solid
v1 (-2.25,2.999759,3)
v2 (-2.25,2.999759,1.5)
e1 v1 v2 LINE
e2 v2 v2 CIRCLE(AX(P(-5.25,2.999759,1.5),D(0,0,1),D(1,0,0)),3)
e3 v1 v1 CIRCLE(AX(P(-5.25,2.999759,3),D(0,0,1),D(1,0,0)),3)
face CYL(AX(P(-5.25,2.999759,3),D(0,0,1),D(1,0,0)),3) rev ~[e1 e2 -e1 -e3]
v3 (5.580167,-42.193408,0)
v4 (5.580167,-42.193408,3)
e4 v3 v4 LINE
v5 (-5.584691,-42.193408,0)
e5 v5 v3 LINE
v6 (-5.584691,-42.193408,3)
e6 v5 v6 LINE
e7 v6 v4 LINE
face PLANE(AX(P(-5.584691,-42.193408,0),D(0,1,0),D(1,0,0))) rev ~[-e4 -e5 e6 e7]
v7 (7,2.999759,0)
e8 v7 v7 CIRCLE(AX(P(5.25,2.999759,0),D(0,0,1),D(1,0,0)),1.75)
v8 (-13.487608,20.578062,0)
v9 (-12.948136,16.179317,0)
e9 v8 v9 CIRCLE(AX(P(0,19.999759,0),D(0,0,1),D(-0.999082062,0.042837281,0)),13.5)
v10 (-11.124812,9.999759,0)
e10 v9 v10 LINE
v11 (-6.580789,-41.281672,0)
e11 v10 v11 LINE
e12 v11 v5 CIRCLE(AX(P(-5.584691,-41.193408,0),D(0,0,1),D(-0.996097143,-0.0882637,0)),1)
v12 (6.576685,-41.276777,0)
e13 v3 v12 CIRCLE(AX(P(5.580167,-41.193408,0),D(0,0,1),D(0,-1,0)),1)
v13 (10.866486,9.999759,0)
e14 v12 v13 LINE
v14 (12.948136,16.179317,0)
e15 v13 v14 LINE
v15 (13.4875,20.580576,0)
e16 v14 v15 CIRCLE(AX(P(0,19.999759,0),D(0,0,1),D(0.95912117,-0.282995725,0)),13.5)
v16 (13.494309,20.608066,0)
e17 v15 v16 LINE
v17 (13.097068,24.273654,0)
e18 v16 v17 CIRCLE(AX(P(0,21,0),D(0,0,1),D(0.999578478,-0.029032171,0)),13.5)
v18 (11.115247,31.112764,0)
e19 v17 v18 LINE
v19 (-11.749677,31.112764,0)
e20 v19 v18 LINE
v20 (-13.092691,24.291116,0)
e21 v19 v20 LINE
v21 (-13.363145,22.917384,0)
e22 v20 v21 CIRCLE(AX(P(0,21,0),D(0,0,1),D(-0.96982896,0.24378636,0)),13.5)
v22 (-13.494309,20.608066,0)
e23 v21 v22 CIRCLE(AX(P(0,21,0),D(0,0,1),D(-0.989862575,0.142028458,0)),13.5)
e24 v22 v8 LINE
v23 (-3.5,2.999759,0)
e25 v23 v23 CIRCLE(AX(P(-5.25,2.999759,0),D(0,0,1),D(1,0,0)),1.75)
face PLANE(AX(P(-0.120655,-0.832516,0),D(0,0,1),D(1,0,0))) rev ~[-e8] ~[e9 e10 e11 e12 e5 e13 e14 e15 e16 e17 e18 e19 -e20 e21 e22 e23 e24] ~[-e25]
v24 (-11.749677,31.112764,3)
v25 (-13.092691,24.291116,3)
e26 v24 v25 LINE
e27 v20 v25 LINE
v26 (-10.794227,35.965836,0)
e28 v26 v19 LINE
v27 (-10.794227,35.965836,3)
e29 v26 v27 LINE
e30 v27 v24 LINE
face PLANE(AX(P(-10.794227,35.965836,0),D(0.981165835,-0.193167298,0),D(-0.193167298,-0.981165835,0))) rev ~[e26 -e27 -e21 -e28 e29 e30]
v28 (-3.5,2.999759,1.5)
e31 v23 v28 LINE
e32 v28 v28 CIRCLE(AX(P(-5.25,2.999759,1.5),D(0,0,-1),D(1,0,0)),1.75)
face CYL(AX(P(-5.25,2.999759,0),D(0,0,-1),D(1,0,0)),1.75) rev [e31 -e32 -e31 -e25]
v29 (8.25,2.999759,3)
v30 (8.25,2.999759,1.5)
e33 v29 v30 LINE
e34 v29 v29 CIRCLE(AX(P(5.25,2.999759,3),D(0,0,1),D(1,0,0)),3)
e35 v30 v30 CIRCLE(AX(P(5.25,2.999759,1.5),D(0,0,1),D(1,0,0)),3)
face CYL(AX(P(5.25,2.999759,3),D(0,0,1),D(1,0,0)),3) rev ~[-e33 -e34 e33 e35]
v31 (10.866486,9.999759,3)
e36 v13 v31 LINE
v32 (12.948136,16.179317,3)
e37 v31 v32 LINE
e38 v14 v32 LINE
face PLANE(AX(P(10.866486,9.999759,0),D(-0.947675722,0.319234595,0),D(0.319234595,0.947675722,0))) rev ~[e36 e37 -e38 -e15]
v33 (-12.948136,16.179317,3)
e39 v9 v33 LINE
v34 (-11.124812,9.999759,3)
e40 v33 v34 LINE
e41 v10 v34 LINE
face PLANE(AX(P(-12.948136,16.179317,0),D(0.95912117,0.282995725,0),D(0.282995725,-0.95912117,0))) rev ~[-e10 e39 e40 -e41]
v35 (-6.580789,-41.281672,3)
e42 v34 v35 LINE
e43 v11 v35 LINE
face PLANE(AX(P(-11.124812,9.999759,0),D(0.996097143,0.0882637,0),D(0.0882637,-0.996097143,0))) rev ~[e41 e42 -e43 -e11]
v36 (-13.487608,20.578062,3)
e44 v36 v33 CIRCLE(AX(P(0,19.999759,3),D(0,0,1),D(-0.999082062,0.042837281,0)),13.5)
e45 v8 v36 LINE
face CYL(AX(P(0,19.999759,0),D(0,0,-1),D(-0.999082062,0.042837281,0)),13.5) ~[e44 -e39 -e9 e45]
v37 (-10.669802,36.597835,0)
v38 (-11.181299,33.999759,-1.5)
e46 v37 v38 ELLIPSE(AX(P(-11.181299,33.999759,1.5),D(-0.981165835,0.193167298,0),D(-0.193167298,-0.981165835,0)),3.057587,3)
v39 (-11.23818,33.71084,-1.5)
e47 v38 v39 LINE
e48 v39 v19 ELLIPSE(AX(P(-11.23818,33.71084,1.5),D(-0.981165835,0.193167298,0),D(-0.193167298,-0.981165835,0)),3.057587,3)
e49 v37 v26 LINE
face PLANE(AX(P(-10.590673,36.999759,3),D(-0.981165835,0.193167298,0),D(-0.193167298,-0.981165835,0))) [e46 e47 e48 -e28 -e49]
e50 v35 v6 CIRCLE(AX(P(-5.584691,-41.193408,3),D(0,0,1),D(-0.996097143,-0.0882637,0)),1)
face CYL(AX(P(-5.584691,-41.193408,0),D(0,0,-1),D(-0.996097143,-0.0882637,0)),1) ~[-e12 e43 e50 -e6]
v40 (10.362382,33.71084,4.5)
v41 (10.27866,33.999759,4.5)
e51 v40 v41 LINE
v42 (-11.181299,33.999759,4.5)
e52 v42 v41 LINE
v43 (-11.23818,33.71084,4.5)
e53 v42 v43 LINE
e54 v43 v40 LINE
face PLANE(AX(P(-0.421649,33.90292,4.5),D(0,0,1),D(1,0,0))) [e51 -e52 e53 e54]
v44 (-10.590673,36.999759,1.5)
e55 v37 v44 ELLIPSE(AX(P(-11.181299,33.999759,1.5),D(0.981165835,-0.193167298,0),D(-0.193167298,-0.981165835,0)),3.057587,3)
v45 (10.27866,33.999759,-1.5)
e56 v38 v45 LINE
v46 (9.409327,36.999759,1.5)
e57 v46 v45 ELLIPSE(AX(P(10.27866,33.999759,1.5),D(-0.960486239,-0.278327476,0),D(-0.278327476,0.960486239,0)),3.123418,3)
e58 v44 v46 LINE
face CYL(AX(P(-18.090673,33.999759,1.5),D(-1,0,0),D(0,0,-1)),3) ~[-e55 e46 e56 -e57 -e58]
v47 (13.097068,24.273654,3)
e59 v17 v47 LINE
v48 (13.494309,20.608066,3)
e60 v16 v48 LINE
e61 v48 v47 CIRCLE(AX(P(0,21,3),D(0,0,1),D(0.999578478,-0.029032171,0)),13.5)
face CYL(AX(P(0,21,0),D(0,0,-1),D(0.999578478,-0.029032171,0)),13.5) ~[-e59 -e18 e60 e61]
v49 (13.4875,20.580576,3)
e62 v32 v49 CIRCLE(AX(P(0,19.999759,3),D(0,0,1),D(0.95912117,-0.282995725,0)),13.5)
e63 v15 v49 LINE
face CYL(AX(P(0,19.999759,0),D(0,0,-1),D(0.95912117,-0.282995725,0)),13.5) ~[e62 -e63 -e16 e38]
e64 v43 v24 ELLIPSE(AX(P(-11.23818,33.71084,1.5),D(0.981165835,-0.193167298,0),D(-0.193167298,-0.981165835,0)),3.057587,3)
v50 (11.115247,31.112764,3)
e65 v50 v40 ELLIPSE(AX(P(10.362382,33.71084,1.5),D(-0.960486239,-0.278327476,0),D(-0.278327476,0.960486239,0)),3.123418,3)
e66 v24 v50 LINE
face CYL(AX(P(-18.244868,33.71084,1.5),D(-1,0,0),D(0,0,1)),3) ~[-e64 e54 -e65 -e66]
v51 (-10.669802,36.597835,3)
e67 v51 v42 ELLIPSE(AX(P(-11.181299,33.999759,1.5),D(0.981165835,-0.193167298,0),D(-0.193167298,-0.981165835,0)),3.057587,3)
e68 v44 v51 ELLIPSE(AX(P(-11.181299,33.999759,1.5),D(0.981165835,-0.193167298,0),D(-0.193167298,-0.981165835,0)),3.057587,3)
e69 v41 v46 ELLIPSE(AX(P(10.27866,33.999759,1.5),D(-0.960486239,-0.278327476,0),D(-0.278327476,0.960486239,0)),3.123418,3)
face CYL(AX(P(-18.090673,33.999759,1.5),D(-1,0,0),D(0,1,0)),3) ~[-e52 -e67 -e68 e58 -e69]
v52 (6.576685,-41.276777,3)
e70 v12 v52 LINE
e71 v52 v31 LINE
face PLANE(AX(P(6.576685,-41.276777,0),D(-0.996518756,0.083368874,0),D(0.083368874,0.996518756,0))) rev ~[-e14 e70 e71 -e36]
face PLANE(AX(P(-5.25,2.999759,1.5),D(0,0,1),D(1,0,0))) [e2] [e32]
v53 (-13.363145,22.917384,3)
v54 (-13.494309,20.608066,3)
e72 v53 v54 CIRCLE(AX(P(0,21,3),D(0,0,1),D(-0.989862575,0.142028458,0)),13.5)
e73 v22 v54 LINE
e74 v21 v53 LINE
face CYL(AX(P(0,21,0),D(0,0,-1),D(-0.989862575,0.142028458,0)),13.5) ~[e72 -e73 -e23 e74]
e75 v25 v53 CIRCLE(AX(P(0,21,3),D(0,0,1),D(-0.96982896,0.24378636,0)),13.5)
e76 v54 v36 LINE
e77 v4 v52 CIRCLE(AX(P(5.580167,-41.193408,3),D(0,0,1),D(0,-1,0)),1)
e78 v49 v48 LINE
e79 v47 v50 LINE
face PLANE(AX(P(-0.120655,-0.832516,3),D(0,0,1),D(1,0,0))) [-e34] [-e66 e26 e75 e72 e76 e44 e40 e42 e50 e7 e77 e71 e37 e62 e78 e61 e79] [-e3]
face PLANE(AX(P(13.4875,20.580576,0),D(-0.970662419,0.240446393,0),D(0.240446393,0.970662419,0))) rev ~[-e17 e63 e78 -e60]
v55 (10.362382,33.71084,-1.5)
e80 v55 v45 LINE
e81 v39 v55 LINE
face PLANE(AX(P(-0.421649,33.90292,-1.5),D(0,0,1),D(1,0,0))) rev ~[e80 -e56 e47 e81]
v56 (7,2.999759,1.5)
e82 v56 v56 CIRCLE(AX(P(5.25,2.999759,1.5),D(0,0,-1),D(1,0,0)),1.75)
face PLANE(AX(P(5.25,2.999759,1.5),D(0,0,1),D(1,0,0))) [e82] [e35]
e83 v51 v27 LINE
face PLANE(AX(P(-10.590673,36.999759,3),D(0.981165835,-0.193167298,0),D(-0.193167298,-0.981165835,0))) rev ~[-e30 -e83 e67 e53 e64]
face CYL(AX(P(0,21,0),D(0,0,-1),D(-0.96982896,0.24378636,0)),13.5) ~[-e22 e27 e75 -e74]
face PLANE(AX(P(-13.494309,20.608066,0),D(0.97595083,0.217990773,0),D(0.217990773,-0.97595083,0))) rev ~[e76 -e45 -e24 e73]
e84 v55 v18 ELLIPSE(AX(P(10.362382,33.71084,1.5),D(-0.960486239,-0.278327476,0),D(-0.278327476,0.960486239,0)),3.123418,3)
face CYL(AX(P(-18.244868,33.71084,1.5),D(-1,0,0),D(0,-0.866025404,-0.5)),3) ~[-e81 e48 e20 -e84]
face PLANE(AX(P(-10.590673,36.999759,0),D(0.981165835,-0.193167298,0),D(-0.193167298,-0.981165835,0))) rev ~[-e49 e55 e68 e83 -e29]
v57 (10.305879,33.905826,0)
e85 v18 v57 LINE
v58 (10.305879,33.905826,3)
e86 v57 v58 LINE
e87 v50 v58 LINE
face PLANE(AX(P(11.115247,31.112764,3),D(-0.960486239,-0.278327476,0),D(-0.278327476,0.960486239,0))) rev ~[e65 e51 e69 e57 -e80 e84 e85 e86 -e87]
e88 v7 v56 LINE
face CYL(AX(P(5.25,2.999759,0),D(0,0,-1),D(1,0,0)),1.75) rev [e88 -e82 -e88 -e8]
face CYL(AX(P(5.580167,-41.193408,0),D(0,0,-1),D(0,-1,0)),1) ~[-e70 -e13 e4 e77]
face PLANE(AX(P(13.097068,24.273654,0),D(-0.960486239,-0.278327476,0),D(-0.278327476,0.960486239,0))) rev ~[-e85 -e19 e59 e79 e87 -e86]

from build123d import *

# Parameters (mm, degrees)
F0_R          = 1.75
F1_DEPTH      = 3
F3_DEPTH      = 1.5
F3_DEPTH_BACK = 4.5
F4_T1_DEPTH   = 35.8553046099
F4_T3_DEPTH   = 35
F5_R          = 3
F6_DEPTH      = 1.5


# Not quite as in the source:
# - a fillet or chamfer that OpenCascade refuses, or shapes differently, is made with other operations: its cross-section is extruded or revolved along the edge and cut away or added
# - a feature names something its author has since deleted; it is built from what else it names


with BuildPart() as f1:
    # F0 (on Top) → F1 (new body)
    with BuildSketch(Plane.XY):
        with BuildLine():
            Line((-5.5846913819, -42.1934081889), (5.5801667099, -42.1934081889))
            ThreePointArc((5.5801667099, -42.1934081889), (6.2571567858, -41.9294003336), (6.5766854657, -41.2767770629))
            Line((6.5766854657, -41.2767770629), (10.8664863973, 9.9997591089))
            Line((10.8664863973, 9.9997591089), (12.9481358013, 16.1793168214))
            ThreePointArc((12.9481358013, 16.1793168214), (13.3997566467, 18.3576501573), (13.4874998392, 20.5805758517))
            Line((13.4874998392, 20.5805758517), (13.4943094486, 20.6080656878))
            ThreePointArc((13.4943094486, 20.6080656878), (13.4214184301, 22.4544852439), (13.0970679667, 24.2736540252))
            Line((13.0970679667, 24.2736540252), (10.3058793621, 33.9058264779))
            Line((10.3058793621, 33.9058264779), (9.4093267365, 36.9997591089))
            Line((9.4093267365, 36.9997591089), (4.9829727946, 36.9997591089))
            Line((4.9829727946, 36.9997591089), (-5.25, 36.9997591089))
            Line((-5.25, 36.9997591089), (-10.5906732635, 36.9997591089))
            Line((-10.5906732635, 36.9997591089), (-10.7942270682, 35.9658364889))
            Line((-10.7942270682, 35.9658364889), (-13.0926909538, 24.2911158576))
            Line((-13.0926909538, 24.2911158576), (-13.3631447598, 22.9173841889))
            ThreePointArc((-13.3631447598, 22.9173841889), (-13.4782769531, 21.765539271), (-13.4943094486, 20.6080656878))
            Line((-13.4943094486, 20.6080656878), (-13.4876078419, 20.5780624058))
            ThreePointArc((-13.4876078419, 20.5780624058), (-13.3996035826, 18.3564016222), (-12.9481358013, 16.1793168214))
            Line((-12.9481358013, 16.1793168214), (-11.1248120452, 9.9997591089))
            Line((-11.1248120452, 9.9997591089), (-6.5807885254, -41.281671889))
            ThreePointArc((-6.5807885254, -41.281671889), (-6.259871469, -41.9310611222), (-5.5846913819, -42.1934081889))
        make_face()
        with Locations((-5.25, 2.9997591089)):
            Circle(F0_R, mode=Mode.SUBTRACT)
        with Locations((5.25, 2.9997591089)):
            Circle(F0_R, mode=Mode.SUBTRACT)
        with BuildLine():
            ThreePointArc((-13.0926909538, 24.2911158576), (-13.2457387677, 23.6077585201), (-13.3631447598, 22.9173841889))
            Line((-13.3631447598, 22.9173841889), (-13.0926909538, 24.2911158576))
        make_face()
    extrude(amount=F1_DEPTH)

    # F2 (on face) → F3 (join, two sides)
    with BuildSketch(Plane.XY.offset(3)) as f3_sk:
        Polygon((9.4093267365, 36.9997591089), (-10.5906732635, 36.9997591089), (-11.7496770502, 31.1127641011), (11.1152465029, 31.1127641011), align=None)
    extrude(amount=F3_DEPTH)
    extrude(f3_sk.sketch, amount=-F3_DEPTH_BACK)

    # F4: fillet of radius 3 on 4 edges, made by hand

    # F4_s2 → F4_t1 (cut)
    with BuildSketch(Plane.YZ.offset(-18.2448675786)):
        with BuildLine():
            ThreePointArc((33.7108403124, 4.5), (32.2108403124, 4.0980762114), (31.1127641011, 3))
            Line((31.1127641011, 3), (31.1127641011, 4.5))
            Line((31.1127641011, 4.5), (33.7108403124, 4.5))
        make_face()
        with BuildLine():
            ThreePointArc((31.1127641011, 0), (32.2108403124, -1.0980762114), (33.7108403124, -1.5))
            Line((33.7108403124, -1.5), (31.1127641011, -1.5))
            Line((31.1127641011, -1.5), (31.1127641011, 0))
        make_face()
    extrude(amount=F4_T1_DEPTH, mode=Mode.SUBTRACT)

    # F4_s4 → F4_t3 (cut)
    with BuildSketch(Plane.YZ.offset(-18.0906732635)):
        with BuildLine():
            ThreePointArc((36.9997591089, 1.5), (36.1210794525, 3.6213203436), (33.9997591089, 4.5))
            Line((33.9997591089, 4.5), (36.9997591089, 4.5))
            Line((36.9997591089, 4.5), (36.9997591089, 1.5))
        make_face()
        with BuildLine():
            ThreePointArc((33.9997591089, -1.5), (36.1210794525, -0.6213203436), (36.9997591089, 1.5))
            Line((36.9997591089, 1.5), (36.9997591089, -1.5))
            Line((36.9997591089, -1.5), (33.9997591089, -1.5))
        make_face()
    extrude(amount=F4_T3_DEPTH, mode=Mode.SUBTRACT)

    # F5 (on face) → F6 (cut)
    with BuildSketch(Plane.XY.offset(3)):
        with Locations((-5.25, 2.9997591089)):
            Circle(F5_R)
        with Locations((5.25, 2.9997591089)):
            Circle(F5_R)
    extrude(amount=-F6_DEPTH, mode=Mode.SUBTRACT)


solid = f1.part
